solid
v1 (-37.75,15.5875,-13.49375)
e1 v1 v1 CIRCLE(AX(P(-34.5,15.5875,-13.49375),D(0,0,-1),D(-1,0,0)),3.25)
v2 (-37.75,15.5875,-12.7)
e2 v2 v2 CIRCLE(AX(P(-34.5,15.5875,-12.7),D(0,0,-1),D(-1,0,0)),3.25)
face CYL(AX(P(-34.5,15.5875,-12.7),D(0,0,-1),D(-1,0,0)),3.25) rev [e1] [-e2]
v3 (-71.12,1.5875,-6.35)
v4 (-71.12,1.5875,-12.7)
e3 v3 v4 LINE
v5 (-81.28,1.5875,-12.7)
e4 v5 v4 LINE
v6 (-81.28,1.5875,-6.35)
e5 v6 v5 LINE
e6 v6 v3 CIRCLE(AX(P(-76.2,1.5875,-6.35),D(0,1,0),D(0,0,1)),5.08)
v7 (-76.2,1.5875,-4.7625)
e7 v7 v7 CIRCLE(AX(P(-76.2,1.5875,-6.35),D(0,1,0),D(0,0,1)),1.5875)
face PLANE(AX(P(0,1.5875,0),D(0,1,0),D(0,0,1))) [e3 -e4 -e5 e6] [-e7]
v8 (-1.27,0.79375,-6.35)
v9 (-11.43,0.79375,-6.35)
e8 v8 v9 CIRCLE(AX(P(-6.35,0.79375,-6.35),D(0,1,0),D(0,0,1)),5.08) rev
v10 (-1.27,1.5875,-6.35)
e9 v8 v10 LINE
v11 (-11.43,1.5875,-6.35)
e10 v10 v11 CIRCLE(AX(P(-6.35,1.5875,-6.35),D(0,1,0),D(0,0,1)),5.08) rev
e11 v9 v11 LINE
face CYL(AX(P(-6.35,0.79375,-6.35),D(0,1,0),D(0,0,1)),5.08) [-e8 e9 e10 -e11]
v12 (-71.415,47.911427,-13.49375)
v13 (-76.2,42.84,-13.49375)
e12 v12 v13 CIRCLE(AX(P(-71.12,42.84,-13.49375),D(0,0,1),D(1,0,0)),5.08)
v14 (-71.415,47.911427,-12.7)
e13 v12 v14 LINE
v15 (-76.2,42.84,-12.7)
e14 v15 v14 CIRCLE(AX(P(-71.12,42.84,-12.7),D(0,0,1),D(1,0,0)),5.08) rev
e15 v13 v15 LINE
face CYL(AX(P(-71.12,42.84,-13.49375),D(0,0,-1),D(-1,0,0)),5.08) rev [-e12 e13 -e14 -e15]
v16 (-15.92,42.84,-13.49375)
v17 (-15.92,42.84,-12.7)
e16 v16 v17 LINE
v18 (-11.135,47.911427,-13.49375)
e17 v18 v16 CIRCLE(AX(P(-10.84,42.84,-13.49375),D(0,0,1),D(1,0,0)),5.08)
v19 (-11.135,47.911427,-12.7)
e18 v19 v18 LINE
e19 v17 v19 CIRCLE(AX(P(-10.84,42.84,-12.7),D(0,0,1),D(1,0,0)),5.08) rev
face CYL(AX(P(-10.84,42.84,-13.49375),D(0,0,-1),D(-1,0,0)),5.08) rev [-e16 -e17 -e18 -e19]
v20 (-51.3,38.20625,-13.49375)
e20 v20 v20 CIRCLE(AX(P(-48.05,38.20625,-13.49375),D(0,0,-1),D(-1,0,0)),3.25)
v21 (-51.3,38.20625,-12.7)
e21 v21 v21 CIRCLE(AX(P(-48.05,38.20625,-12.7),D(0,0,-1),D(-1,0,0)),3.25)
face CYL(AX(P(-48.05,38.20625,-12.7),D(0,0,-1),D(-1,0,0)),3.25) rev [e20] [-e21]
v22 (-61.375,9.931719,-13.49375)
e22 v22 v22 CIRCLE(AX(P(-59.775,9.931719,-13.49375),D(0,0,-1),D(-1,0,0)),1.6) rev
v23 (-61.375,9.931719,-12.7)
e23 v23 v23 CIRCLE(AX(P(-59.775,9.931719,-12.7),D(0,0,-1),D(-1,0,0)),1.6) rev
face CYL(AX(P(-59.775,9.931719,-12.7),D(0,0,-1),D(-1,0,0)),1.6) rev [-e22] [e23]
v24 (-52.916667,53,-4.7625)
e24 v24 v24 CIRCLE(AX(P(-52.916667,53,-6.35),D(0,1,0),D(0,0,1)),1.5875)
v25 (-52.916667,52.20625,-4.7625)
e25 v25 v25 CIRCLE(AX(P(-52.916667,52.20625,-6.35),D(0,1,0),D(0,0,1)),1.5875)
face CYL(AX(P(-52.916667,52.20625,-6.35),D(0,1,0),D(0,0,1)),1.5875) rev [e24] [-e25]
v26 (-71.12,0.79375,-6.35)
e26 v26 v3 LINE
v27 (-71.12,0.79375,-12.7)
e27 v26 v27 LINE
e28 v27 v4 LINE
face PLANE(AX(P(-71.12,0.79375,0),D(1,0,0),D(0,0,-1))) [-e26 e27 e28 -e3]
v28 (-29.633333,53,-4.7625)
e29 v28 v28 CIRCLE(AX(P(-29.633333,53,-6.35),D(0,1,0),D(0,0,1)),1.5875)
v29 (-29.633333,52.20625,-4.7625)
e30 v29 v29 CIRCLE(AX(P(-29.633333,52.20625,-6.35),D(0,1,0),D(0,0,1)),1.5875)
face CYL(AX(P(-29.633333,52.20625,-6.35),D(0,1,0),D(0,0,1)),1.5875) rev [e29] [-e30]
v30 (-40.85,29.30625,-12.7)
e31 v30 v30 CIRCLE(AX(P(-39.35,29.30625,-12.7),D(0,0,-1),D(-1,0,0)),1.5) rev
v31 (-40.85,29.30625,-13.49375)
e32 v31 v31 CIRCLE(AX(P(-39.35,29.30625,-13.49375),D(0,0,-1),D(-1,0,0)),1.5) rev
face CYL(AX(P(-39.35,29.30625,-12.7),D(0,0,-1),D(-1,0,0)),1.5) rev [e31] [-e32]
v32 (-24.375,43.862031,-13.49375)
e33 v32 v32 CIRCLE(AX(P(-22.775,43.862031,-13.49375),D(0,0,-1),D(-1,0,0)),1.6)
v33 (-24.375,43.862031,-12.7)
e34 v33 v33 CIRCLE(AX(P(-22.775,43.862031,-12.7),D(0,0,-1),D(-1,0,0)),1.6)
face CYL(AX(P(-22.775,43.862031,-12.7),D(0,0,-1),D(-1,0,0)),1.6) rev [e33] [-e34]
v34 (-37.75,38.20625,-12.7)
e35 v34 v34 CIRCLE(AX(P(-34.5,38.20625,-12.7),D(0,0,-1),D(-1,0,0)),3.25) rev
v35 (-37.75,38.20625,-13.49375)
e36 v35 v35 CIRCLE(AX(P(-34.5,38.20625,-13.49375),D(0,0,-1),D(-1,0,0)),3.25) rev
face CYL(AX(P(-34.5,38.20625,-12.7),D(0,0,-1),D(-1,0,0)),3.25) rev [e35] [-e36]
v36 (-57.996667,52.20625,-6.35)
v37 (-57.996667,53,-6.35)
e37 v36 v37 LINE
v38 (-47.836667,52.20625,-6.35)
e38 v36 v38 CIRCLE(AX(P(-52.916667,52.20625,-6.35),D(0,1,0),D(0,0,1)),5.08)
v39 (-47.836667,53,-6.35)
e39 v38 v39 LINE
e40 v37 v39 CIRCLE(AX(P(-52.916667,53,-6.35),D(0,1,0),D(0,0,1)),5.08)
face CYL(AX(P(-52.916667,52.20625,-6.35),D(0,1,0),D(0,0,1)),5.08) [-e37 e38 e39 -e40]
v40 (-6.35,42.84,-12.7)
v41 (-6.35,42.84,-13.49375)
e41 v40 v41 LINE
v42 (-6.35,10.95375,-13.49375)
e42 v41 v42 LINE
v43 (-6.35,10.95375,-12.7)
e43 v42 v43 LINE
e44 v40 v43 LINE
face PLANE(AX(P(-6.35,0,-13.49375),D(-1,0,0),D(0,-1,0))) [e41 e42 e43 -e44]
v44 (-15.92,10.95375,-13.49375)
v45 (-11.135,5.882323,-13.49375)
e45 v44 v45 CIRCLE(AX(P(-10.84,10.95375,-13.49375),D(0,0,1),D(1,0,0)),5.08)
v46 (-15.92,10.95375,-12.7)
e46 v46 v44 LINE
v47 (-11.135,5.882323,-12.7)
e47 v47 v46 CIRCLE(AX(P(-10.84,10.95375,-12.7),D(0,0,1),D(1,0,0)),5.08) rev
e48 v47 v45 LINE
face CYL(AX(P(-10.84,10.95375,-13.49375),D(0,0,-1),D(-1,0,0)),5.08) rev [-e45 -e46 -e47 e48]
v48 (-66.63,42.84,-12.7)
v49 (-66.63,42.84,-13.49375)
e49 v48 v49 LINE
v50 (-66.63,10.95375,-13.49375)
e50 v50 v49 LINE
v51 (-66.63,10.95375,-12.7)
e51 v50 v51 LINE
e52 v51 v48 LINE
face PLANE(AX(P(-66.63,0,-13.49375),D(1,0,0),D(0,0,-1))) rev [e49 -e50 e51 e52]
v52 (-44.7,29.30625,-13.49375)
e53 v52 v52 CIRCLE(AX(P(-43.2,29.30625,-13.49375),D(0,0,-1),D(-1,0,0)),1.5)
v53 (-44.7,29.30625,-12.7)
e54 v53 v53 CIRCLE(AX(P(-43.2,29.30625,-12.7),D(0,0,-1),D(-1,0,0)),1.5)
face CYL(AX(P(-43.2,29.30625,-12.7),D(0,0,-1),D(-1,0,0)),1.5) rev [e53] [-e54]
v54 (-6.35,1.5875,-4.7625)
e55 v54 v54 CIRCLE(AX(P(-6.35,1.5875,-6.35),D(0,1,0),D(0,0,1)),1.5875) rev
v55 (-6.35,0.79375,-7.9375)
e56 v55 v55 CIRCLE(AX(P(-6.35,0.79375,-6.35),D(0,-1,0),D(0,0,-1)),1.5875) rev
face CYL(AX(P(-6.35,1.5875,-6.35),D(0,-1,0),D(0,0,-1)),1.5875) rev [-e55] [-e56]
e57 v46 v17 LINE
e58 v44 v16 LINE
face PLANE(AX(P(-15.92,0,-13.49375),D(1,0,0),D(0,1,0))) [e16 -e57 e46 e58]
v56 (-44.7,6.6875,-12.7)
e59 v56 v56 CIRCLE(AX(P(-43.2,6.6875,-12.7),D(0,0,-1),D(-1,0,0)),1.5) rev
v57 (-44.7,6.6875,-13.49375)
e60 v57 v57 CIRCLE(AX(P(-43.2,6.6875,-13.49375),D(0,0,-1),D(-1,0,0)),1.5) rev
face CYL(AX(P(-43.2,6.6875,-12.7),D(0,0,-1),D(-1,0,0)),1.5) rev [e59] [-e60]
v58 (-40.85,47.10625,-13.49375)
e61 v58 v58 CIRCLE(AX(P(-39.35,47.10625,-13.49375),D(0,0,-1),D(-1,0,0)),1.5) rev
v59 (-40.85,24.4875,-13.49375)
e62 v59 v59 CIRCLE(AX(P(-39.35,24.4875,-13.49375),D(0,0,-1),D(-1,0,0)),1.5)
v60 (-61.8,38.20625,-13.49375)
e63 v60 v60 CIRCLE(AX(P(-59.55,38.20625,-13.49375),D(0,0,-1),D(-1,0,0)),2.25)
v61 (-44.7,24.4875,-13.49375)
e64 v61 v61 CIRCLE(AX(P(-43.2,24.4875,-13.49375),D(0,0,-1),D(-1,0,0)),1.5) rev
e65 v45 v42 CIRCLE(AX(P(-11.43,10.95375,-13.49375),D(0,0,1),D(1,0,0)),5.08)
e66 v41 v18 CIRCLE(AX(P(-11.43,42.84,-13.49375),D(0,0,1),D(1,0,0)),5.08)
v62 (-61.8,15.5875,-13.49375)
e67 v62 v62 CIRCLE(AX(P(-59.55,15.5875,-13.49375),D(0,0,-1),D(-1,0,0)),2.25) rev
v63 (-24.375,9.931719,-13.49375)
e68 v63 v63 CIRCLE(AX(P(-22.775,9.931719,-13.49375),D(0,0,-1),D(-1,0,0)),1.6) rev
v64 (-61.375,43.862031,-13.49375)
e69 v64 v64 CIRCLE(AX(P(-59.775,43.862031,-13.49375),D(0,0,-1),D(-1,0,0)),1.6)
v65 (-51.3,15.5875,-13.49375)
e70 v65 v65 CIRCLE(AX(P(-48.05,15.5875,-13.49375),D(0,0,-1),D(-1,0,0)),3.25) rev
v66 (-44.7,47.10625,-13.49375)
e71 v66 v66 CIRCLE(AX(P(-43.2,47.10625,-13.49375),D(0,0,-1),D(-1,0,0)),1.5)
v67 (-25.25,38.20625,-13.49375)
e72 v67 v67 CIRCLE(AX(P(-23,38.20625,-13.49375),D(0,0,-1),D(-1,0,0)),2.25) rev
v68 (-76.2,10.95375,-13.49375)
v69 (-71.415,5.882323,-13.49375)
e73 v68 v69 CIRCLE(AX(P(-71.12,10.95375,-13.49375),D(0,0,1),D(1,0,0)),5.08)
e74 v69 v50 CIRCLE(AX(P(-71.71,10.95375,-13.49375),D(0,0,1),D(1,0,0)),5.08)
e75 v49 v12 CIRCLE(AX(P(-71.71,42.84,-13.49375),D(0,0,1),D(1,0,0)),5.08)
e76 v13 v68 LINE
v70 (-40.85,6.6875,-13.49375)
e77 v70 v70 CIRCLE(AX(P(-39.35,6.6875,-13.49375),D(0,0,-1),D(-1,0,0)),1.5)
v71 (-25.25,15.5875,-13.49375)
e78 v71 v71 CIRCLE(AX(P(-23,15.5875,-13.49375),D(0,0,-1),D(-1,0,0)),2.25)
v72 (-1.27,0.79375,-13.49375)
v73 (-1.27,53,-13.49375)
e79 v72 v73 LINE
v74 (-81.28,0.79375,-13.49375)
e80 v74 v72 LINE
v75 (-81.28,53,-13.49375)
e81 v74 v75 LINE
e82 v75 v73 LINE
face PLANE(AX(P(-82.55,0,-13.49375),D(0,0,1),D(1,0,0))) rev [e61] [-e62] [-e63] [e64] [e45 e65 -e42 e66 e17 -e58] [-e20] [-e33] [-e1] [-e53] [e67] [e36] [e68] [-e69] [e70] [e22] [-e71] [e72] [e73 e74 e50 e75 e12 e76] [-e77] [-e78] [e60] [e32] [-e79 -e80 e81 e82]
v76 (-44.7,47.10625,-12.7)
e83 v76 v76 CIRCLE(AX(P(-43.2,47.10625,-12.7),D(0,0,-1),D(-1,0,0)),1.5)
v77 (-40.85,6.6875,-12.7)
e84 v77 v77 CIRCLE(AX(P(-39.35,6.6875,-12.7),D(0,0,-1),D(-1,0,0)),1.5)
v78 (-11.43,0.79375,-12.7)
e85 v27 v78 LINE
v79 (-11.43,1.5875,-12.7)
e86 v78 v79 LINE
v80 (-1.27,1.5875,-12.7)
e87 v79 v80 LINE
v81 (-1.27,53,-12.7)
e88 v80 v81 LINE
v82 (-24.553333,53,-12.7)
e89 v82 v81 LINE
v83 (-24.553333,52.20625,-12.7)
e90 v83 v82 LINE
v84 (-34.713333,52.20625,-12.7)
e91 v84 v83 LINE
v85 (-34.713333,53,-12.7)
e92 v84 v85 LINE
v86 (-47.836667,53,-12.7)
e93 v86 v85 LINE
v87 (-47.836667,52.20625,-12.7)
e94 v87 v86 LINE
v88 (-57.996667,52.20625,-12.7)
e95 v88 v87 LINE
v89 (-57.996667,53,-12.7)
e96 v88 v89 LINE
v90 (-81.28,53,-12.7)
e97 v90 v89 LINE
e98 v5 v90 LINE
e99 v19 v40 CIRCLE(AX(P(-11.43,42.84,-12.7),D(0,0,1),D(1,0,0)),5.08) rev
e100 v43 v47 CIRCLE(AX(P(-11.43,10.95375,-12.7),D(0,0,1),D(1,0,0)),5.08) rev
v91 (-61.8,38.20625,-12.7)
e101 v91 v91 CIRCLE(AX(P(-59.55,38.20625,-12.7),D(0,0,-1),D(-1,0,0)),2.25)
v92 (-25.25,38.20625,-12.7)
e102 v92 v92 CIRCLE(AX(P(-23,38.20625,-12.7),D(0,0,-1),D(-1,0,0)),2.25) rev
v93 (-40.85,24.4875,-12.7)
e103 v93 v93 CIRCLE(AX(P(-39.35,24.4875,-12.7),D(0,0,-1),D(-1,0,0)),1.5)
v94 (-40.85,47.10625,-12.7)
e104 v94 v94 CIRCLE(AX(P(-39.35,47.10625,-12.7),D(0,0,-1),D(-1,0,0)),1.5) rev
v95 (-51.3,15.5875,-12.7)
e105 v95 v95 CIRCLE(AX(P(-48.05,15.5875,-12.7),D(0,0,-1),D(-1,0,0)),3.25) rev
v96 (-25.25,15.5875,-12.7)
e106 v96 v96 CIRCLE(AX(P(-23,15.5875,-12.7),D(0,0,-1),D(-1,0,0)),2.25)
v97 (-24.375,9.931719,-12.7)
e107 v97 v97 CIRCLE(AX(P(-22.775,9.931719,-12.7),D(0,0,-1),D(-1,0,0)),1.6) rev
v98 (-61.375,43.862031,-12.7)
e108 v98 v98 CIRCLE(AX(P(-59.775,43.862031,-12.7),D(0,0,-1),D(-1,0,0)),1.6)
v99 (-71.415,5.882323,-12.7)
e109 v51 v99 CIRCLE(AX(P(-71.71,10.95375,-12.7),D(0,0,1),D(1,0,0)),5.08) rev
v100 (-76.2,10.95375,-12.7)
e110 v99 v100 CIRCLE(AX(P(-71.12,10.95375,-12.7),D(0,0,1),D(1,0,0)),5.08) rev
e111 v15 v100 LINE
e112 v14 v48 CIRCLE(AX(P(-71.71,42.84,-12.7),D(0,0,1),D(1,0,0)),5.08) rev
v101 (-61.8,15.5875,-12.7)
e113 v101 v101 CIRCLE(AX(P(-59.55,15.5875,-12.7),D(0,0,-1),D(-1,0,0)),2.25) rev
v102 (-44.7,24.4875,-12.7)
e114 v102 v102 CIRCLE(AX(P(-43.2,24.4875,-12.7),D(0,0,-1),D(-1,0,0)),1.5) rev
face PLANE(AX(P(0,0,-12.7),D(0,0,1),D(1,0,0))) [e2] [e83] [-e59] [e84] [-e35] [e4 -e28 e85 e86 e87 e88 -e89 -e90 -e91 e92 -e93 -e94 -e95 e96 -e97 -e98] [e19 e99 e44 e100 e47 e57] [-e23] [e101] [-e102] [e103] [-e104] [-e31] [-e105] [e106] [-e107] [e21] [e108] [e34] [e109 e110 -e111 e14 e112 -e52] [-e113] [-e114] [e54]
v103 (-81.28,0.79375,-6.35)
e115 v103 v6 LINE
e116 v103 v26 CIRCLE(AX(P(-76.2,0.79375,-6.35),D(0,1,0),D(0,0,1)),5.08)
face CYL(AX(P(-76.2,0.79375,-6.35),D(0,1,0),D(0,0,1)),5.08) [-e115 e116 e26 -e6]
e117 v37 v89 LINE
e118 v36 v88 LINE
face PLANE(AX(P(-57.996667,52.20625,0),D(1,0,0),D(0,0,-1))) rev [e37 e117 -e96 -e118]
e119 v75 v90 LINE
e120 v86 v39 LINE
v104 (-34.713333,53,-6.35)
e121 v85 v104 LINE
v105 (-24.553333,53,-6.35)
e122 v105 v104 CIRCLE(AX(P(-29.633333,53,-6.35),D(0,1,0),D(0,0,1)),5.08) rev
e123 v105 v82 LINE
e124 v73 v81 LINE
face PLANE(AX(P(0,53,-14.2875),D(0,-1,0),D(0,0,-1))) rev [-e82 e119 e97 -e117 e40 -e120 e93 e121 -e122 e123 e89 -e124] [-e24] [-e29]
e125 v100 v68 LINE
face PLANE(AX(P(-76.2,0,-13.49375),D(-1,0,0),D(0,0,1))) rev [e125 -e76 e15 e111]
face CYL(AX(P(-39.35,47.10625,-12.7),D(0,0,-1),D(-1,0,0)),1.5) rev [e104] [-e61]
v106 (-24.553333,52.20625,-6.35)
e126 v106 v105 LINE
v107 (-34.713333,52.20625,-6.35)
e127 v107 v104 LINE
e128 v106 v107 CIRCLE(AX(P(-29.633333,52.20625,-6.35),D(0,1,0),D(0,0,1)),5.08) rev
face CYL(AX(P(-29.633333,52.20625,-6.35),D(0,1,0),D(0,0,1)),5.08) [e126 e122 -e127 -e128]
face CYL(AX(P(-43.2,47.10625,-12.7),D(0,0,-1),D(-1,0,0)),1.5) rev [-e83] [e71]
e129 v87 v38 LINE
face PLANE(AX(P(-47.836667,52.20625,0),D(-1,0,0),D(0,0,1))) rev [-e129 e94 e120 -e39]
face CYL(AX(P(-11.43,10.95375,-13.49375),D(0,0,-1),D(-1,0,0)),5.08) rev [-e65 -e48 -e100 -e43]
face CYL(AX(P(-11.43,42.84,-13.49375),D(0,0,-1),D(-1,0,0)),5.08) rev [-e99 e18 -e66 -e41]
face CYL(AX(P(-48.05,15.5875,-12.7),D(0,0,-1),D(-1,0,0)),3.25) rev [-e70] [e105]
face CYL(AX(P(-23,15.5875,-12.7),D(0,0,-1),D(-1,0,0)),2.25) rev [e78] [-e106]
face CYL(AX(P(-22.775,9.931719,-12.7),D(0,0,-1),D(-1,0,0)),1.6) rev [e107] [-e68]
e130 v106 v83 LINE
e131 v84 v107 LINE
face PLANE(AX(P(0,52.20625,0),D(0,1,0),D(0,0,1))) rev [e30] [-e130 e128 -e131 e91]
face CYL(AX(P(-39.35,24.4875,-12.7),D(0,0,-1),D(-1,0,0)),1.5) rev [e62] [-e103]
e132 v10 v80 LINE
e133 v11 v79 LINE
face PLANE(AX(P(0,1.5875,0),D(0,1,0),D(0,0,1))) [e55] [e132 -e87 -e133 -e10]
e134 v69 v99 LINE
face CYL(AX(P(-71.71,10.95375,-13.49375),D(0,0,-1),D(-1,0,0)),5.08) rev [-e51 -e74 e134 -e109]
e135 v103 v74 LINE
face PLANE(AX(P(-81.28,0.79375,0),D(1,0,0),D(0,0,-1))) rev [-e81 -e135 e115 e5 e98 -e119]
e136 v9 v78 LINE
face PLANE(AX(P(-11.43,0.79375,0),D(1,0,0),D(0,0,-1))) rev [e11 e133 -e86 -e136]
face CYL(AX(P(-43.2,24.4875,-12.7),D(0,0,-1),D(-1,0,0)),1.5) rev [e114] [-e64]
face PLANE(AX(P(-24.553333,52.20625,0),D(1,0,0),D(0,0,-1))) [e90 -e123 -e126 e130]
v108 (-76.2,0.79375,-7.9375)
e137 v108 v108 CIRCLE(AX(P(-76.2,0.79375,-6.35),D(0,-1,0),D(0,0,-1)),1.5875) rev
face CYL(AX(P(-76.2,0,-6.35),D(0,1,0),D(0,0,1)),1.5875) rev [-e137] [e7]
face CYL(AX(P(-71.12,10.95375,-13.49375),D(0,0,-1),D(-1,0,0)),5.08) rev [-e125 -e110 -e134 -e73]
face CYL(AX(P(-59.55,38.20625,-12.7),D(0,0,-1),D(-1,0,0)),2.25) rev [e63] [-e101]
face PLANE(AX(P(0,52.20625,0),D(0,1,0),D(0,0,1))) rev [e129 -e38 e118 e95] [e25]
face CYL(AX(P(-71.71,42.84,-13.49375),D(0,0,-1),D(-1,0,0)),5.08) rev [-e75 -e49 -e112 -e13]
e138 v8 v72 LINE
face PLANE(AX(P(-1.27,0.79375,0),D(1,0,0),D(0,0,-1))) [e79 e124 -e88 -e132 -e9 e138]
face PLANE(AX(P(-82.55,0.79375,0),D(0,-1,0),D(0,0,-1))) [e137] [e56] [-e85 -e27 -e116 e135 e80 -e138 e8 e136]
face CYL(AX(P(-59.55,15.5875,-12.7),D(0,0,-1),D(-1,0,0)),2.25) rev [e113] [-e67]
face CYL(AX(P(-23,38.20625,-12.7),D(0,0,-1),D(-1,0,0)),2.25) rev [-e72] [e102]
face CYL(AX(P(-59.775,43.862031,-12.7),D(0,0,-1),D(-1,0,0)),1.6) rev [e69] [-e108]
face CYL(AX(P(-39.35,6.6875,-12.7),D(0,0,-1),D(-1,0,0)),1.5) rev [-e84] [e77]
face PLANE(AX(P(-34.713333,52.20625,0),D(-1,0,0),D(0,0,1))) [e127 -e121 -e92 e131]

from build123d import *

# Parameters (mm, degrees)
SKETCH1_R             = 1.5875
BOSS_EXTRUDE1_DEPTH   = 1.5875
SKETCH1_W             = 12.7
SKETCH1_H             = 12.7
BOSS_EXTRUDE1_2_DEPTH = 1.5875
SKETCH2_W             = 69.85
SKETCH2_H             = 53
BOSS_EXTRUDE2_DEPTH   = 1.5875
BOSS_EXTRUDE3_DEPTH   = 1.5875
SKETCH6_W             = 1.5875
SKETCH6_H             = 53
BOSS_EXTRUDE4_DEPTH   = 12.7
SKETCH7_W             = 12.7
SKETCH7_H             = 12.7
CUT_EXTRUDE1_DEPTH    = 12.7
SKETCH10_W            = 13.49375
SKETCH10_H            = 0.79375
CUT_EXTRUDE3_DEPTH    = 100.134429722
SKETCH13_R            = 1.25
SKETCH13_R_2          = 3
SKETCH13_R_3          = 2.000000064
CUT_EXTRUDE4_DEPTH    = 12.7
FILLET1_R             = 6.35
FILLET2_R             = 6.35
SKETCH14_W            = 12.7
SKETCH14_H            = 12.7
SKETCH14_R            = 1.5875
BOSS_EXTRUDE5_DEPTH   = 0.79375
FILLET3_R             = 6.35
SKETCH15_R            = 1.6
CUT_EXTRUDE7_DEPTH    = 0.79375
SKETCH16_R            = 1.5875
BOSS_EXTRUDE6_DEPTH   = 0.79375
SKETCH17_W            = 12.7
SKETCH17_H            = 14.933466397
CUT_EXTRUDE8_DEPTH    = 0.79375
CUT_EXTRUDE9_DEPTH    = 0.79375
SKETCH19_W            = 1.27
SKETCH19_H            = 52.20625
CUT_EXTRUDE11_DEPTH   = 0.79375
CUT_EXTRUDE12_DEPTH   = 0.79375
FILLET4_R             = 5.08
FILLET5_R             = 5.08
SKETCH22_R            = 2.25
SKETCH22_R_2          = 2.000000064
SKETCH22_R_3          = 3.25
SKETCH22_R_4          = 3
SKETCH22_R_5          = 1.5
SKETCH22_R_6          = 1.25
CUT_EXTRUDE13_DEPTH   = 0.79375


# Some blends are built 0.0001 mm under size
with BuildPart() as part:
    # Sketch1 → Boss-Extrude1 (new body)
    with BuildSketch(Plane(origin=(0, 0, 0), x_dir=(1, 0, 0), z_dir=(0, 1, 0))):
        Polygon((-12.7, 0), (0, 0), (0, 12.7), (-12.7, 12.7), (-12.7, 6.35), align=None)
        with Locations(Location((-6.35, 6.35, 0), (0, 0, 270))):
            Circle(SKETCH1_R, mode=Mode.SUBTRACT)
    extrude(amount=BOSS_EXTRUDE1_DEPTH)



with BuildPart() as body_2:
    # Sketch1 → Boss-Extrude1 2 (new body)
    with BuildSketch(Plane(origin=(0, 0, 0), x_dir=(1, 0, 0), z_dir=(0, 1, 0))):
        with Locations((-63.5, 6.35)):
            Rectangle(SKETCH1_W, SKETCH1_H)
        with Locations(Location((-63.5, 6.35, 0), (0, 0, 270))):
            Circle(SKETCH1_R, mode=Mode.SUBTRACT)
    extrude(amount=BOSS_EXTRUDE1_2_DEPTH)


with BuildPart() as part_1:
    add(part.part)

    add(body_2.part)  # Boss-Extrude2 merges body 2
    # Sketch2 → Boss-Extrude2 (add)
    with BuildSketch(Plane(origin=(0, 0, -12.7), x_dir=(-1, 0, 0), z_dir=(0, 0, -1))):
        with Locations((34.925, 26.5)):
            Rectangle(SKETCH2_W, SKETCH2_H)
    extrude(amount=BOSS_EXTRUDE2_DEPTH)

    # Sketch5 → Boss-Extrude3 (add)
    with BuildSketch(Plane(origin=(0, 1.5875, 0), x_dir=(1, 0, 0), z_dir=(0, 1, 0))):
        with BuildLine():
            Line((-69.85, 0), (-69.85, 6.35))
            Line((-69.85, 6.35), (-74.6125, 6.35))
            ThreePointArc((-74.6125, 6.35), (-76.2, 4.7625), (-77.7875, 6.35))
            Line((-77.7875, 6.35), (-82.55, 6.35))
            Line((-82.55, 6.35), (-82.55, 0))
            Line((-82.55, 0), (-69.85, 0))
        make_face()
        with BuildLine():
            ThreePointArc((-77.7875, 6.35), (-77.322532015, 7.472532015), (-76.2, 7.9375))
            Line((-76.2, 7.9375), (-76.2, 12.7))
            Line((-76.2, 12.7), (-82.55, 12.7))
            Line((-82.55, 12.7), (-82.55, 6.35))
            Line((-82.55, 6.35), (-77.7875, 6.35))
        make_face()
        with BuildLine():
            Line((-74.6125, 6.35), (-69.85, 6.35))
            Line((-69.85, 6.35), (-69.85, 12.7))
            Line((-69.85, 12.7), (-76.2, 12.7))
            Line((-76.2, 12.7), (-76.2, 7.9375))
            ThreePointArc((-76.2, 7.9375), (-75.077467985, 7.472532015), (-74.6125, 6.35))
        make_face()
    extrude(amount=-BOSS_EXTRUDE3_DEPTH)

    # Sketch6 → Boss-Extrude4 (add)
    with BuildSketch(Plane.ZY.offset(69.85)):
        with Locations((-13.49375, 26.5)):
            Rectangle(SKETCH6_W, SKETCH6_H)
    extrude(amount=BOSS_EXTRUDE4_DEPTH)

    # Sketch7 → Cut-Extrude1 (cut)
    with BuildSketch(Plane(origin=(0, 1.5875, 0), x_dir=(1, 0, 0), z_dir=(0, 1, 0))):
        with Locations((-63.5, 6.35)):
            Rectangle(SKETCH7_W, SKETCH7_H)
    extrude(amount=-CUT_EXTRUDE1_DEPTH, mode=Mode.SUBTRACT)

    # Sketch10 → Cut-Extrude3 (cut, through all)
    with BuildSketch(Plane(origin=(0, 0, 0), x_dir=(0, 0, -1), z_dir=(1, 0, 0))):
        with Locations((6.746875, 0.396875)):
            Rectangle(SKETCH10_W, SKETCH10_H)
        Polygon((13.49375, 0.79375), (13.49375, 0), (14.2875, 0), (14.2875, 53), (13.49375, 53), align=None)
    extrude(amount=-CUT_EXTRUDE3_DEPTH, mode=Mode.SUBTRACT)

    # Sketch13 → Cut-Extrude4 (cut)
    with BuildSketch(Plane(origin=(0, 0, -13.49375), x_dir=(-1, 0, 0), z_dir=(0, 0, -1))):
        with Locations((43.2, 24.48749994)):
            Circle(SKETCH13_R)
        with Locations((43.2, 6.68749994)):
            Circle(SKETCH13_R)
        with Locations((34.5, 15.58749994)):
            Circle(SKETCH13_R_2)
        with Locations((23, 15.58749994)):
            Circle(SKETCH13_R_3)
        with Locations((39.35, 6.68749994)):
            Circle(SKETCH13_R)
        with Locations((39.35, 24.48749994)):
            Circle(SKETCH13_R)
        with Locations((48.05, 15.58749994)):
            Circle(SKETCH13_R_2)
        with Locations((59.55, 15.58749994)):
            Circle(SKETCH13_R_3)
        with Locations((59.55, 38.20625006)):
            Circle(SKETCH13_R_3)
        with Locations((48.05, 38.20625006)):
            Circle(SKETCH13_R_2)
        with Locations((39.35, 29.30625006)):
            Circle(SKETCH13_R)
        with Locations(Location((39.35, 47.10625006, 0), (0, 0, 180))):
            Circle(SKETCH13_R)
        with Locations((23, 38.20625006)):
            Circle(SKETCH13_R_3)
        with Locations((34.5, 38.20625006)):
            Circle(SKETCH13_R_2)
        with Locations((43.2, 47.10625006)):
            Circle(SKETCH13_R)
        with Locations((43.2, 29.30625006)):
            Circle(SKETCH13_R)
    extrude(amount=-CUT_EXTRUDE4_DEPTH, mode=Mode.SUBTRACT)

    # Fillet1
    fillet1_edges = [part_1.edges().sort_by_distance(p)[0] for p in [
        (-12.7, 1.190625, 0),
        (0, 1.190625, 0),
    ]]
    fillet(fillet1_edges, radius=FILLET1_R - 0.0001)  # a hair under: the kernel refuses the full size

    # Fillet2
    fillet2_edges = [part_1.edges().sort_by_distance(p)[0] for p in [
        (-82.55, 1.190625, 0),
        (-69.85, 1.190625, 0),
    ]]
    fillet(fillet2_edges, radius=FILLET2_R - 0.0001)  # a hair under: the kernel refuses the full size

    # Sketch14 → Boss-Extrude5 (add)
    with BuildSketch(Plane(origin=(0, 53, 0), x_dir=(1, 0, 0), z_dir=(0, 1, 0))):
        with Locations((-41.275, 6.35)):
            Rectangle(SKETCH14_W, SKETCH14_H)
        with Locations(Location((-41.275, 6.35, 0), (0, 0, 270))):
            Circle(SKETCH14_R, mode=Mode.SUBTRACT)
    extrude(amount=-BOSS_EXTRUDE5_DEPTH)

    # Fillet3
    fillet3_edges = [part_1.edges().sort_by_distance(p)[0] for p in [
        (-47.625, 52.603125, 0),
        (-34.925, 52.603125, 0),
    ]]
    fillet(fillet3_edges, radius=FILLET3_R - 0.0001)  # a hair under: the kernel refuses the full size

    # Sketch15 → Cut-Extrude7 (cut)
    with BuildSketch(Plane(origin=(0, 0, -13.49375), x_dir=(-1, 0, 0), z_dir=(0, 0, -1))):
        with Locations((22.775, 43.862031033)):
            Circle(SKETCH15_R)
        with Locations((22.775, 9.931718967)):
            Circle(SKETCH15_R)
        with Locations((59.775, 9.931718967)):
            Circle(SKETCH15_R)
        with Locations((59.775, 43.862031033)):
            Circle(SKETCH15_R)
    extrude(amount=-CUT_EXTRUDE7_DEPTH, mode=Mode.SUBTRACT)

    # Sketch16 → Boss-Extrude6 (add)
    # profile 1 of 2: a face of its own
    with BuildSketch(Plane(origin=(0, 53, 0), x_dir=(1, 0, 0), z_dir=(0, 1, 0))):
        with BuildLine():
            Line((-57.996666667, 12.7), (-57.996666667, 6.35))
            ThreePointArc((-57.996666667, 6.35), (-52.916666667, 1.27), (-47.836666667, 6.35))
            Line((-47.836666667, 6.35), (-47.836666667, 12.7))
            Line((-47.836666667, 12.7), (-57.996666667, 12.7))
        make_face()
        with Locations(Location((-52.916666667, 6.35, 0), (0, 0, 270))):
            Circle(SKETCH16_R, mode=Mode.SUBTRACT)
    # profile 2 of 2: a face of its own
    with BuildSketch(Plane(origin=(0, 53, 0), x_dir=(1, 0, 0), z_dir=(0, 1, 0))):
        with BuildLine():
            Line((-24.553333333, 12.7), (-34.713333333, 12.7))
            Line((-34.713333333, 12.7), (-34.713333333, 6.35))
            ThreePointArc((-34.713333333, 6.35), (-29.633333333, 1.27), (-24.553333333, 6.35))
            Line((-24.553333333, 6.35), (-24.553333333, 12.7))
        make_face()
        with Locations(Location((-29.633333333, 6.35, 0), (0, 0, 270))):
            Circle(SKETCH16_R, mode=Mode.SUBTRACT)
    extrude(amount=-BOSS_EXTRUDE6_DEPTH)

    # Sketch17 → Cut-Extrude8 (cut)
    with BuildSketch(Plane(origin=(0, 53, 0), x_dir=(1, 0, 0), z_dir=(0, 1, 0))):
        with Locations((-41.275, 5.233266802)):
            Rectangle(SKETCH17_W, SKETCH17_H)
    extrude(amount=-CUT_EXTRUDE8_DEPTH, mode=Mode.SUBTRACT)

    # Sketch18 → Cut-Extrude9 (cut)
    with BuildSketch(Plane(origin=(0, 1.5875, 0), x_dir=(1, 0, 0), z_dir=(0, 1, 0))):
        with BuildLine():
            ThreePointArc((-71.12, 6.35), (-76.2, 1.27), (-81.28, 6.35))
            Line((-81.28, 6.35), (-81.28, 12.7))
            Line((-81.28, 12.7), (-82.55, 12.7))
            Line((-82.55, 12.7), (-82.55, 6.35))
            ThreePointArc((-82.55, 6.35), (-80.690128061, 1.859871939), (-76.2, 0))
            ThreePointArc((-76.2, 0), (-71.709871939, 1.859871939), (-69.85, 6.35))
            Line((-69.85, 6.35), (-69.85, 12.7))
            Line((-69.85, 12.7), (-71.12, 12.7))
            Line((-71.12, 12.7), (-71.12, 6.35))
        make_face()
        with BuildLine():
            Line((-1.27, 6.35), (-1.27, 12.7))
            Line((-1.27, 12.7), (0, 12.7))
            Line((0, 12.7), (0, 6.35))
            ThreePointArc((0, 6.35), (-6.35, 0), (-12.7, 6.35))
            Line((-12.7, 6.35), (-12.7, 12.7))
            Line((-12.7, 12.7), (-11.43, 12.7))
            Line((-11.43, 12.7), (-11.43, 6.35))
            ThreePointArc((-11.43, 6.35), (-6.35, 1.27), (-1.27, 6.35))
        make_face()
    extrude(amount=-CUT_EXTRUDE9_DEPTH, mode=Mode.SUBTRACT)


with BuildPart() as cut_extrude9_kept_piece:
    # of the separate pieces the step leaves, the one the design keeps (cut_extrude9_pieces_kept)
    add(part_1.part.solids().sort_by_distance((-34.713333333, 53, -12.7))[0])

    # Sketch19 → Cut-Extrude11 (cut)
    with BuildSketch(Plane.XY.offset(-12.7)):
        Polygon((-82.55, 53), (-82.55, 0.79375), (-81.28, 0.79375), (-81.28, 1.5875), (-81.28, 53), align=None)
        with Locations((-0.635, 26.896875)):
            Rectangle(SKETCH19_W, SKETCH19_H)
    extrude(amount=-CUT_EXTRUDE11_DEPTH, mode=Mode.SUBTRACT)

    # Sketch21 → Cut-Extrude12 (cut)
    with BuildSketch(Plane.XY.offset(-12.7)):
        Polygon((-76.2, 5.87375), (-66.630000064, 5.87375), (-66.630000064, 47.92), (-76.2, 47.92), (-76.2, 26.93749994), align=None)
        Polygon((-15.919999936, 47.92), (-6.35, 47.92), (-6.35, 26.93749994), (-6.35, 5.87375), (-15.919999936, 5.87375), align=None)
    extrude(amount=-CUT_EXTRUDE12_DEPTH, mode=Mode.SUBTRACT)

    # Fillet4
    # the kernel refuses this fillet: 5.08 mm, written as the material it adds along each edge
    with BuildSketch(Plane(origin=(-76.2, 47.92, -12.7), x_dir=(0, -1, 0), z_dir=(0, 0, -1)), Plane(origin=(-66.630000064, 47.92, -12.7), x_dir=(-1, 0, 0), z_dir=(0, 0, -1))) as fillet4_piece_1:
        with BuildLine():
            CenterArc((FILLET4_R, -FILLET4_R), FILLET4_R, 90, 90)
            Line((0, -FILLET4_R), (0, 0))
            Line((0, 0), (FILLET4_R, 0))
        make_face()
    extrude(amount=0.79375)

    # Fillet5
    # the kernel refuses this fillet: 5.08 mm, written as the material it adds along each edge
    with BuildSketch(Plane(origin=(-6.35, 47.92, -12.7), x_dir=(-1, 0, 0), z_dir=(0, 0, -1)), Plane(origin=(-15.919999936, 5.87375, -12.7), x_dir=(1, 0, 0), z_dir=(0, 0, -1)), Plane(origin=(-6.35, 5.87375, -12.7), x_dir=(0, 1, 0), z_dir=(0, 0, -1)), Plane(origin=(-66.630000064, 5.87375, -12.7), x_dir=(0, 1, 0), z_dir=(0, 0, -1))) as fillet5_piece_1:
        with BuildLine():
            CenterArc((FILLET5_R, -FILLET5_R), FILLET5_R, 90, 90)
            Line((0, -FILLET5_R), (0, 0))
            Line((0, 0), (FILLET5_R, 0))
        make_face()
    extrude(amount=0.79375)
    with BuildSketch(Plane(origin=(-15.919999936, 47.92, -12.7), x_dir=(1, 0, 0), z_dir=(0, 0, -1)), Plane(origin=(-76.2, 5.87375, -12.7), x_dir=(0, 1, 0), z_dir=(0, 0, -1))) as fillet5_piece_2:
        with BuildLine():
            CenterArc((FILLET5_R, FILLET5_R), FILLET5_R, 180, 90)
            Line((0, FILLET5_R), (0, 0))
            Line((0, 0), (FILLET5_R, 0))
        make_face()
    extrude(amount=0.79375)

    # Sketch22 → Cut-Extrude13 (cut)
    # profile 1 of 16: a face of its own
    with BuildSketch(Plane(origin=(0, 0, -13.49375), x_dir=(-1, 0, 0), z_dir=(0, 0, -1))):
        with Locations((23, 38.20625006)):
            Circle(SKETCH22_R)
        with Locations((23, 38.20625006)):
            Circle(SKETCH22_R_2, mode=Mode.SUBTRACT)
    # profile 2 of 16: a face of its own
    with BuildSketch(Plane(origin=(0, 0, -13.49375), x_dir=(-1, 0, 0), z_dir=(0, 0, -1))):
        with Locations((34.5, 38.20625006)):
            Circle(SKETCH22_R_3)
        with Locations((34.5, 38.20625006)):
            Circle(SKETCH22_R_4, mode=Mode.SUBTRACT)
    # profile 3 of 16: a face of its own
    with BuildSketch(Plane(origin=(0, 0, -13.49375), x_dir=(-1, 0, 0), z_dir=(0, 0, -1))):
        with Locations((39.35, 47.10625006)):
            Circle(SKETCH22_R_5)
        with Locations((39.35, 47.10625006)):
            Circle(SKETCH22_R_6, mode=Mode.SUBTRACT)
    # profile 4 of 16: a face of its own
    with BuildSketch(Plane(origin=(0, 0, -13.49375), x_dir=(-1, 0, 0), z_dir=(0, 0, -1))):
        with Locations((43.2, 47.10625006)):
            Circle(SKETCH22_R_5)
        with Locations((43.2, 47.10625006)):
            Circle(SKETCH22_R_6, mode=Mode.SUBTRACT)
    # profile 5 of 16: a face of its own
    with BuildSketch(Plane(origin=(0, 0, -13.49375), x_dir=(-1, 0, 0), z_dir=(0, 0, -1))):
        with Locations((48.05, 38.20625006)):
            Circle(SKETCH22_R_3)
        with Locations((48.05, 38.20625006)):
            Circle(SKETCH22_R_4, mode=Mode.SUBTRACT)
    # profile 6 of 16: a face of its own
    with BuildSketch(Plane(origin=(0, 0, -13.49375), x_dir=(-1, 0, 0), z_dir=(0, 0, -1))):
        with Locations((59.55, 38.20625006)):
            Circle(SKETCH22_R)
        with Locations((59.55, 38.20625006)):
            Circle(SKETCH22_R_2, mode=Mode.SUBTRACT)
    # profile 7 of 16: a face of its own
    with BuildSketch(Plane(origin=(0, 0, -13.49375), x_dir=(-1, 0, 0), z_dir=(0, 0, -1))):
        with Locations((59.55, 15.58749994)):
            Circle(SKETCH22_R)
        with Locations((59.55, 15.58749994)):
            Circle(SKETCH22_R_2, mode=Mode.SUBTRACT)
    # profile 8 of 16: a face of its own
    with BuildSketch(Plane(origin=(0, 0, -13.49375), x_dir=(-1, 0, 0), z_dir=(0, 0, -1))):
        with Locations((39.35, 6.68749994)):
            Circle(SKETCH22_R_5)
        with Locations((39.35, 6.68749994)):
            Circle(SKETCH22_R_6, mode=Mode.SUBTRACT)
    # profile 9 of 16: a face of its own
    with BuildSketch(Plane(origin=(0, 0, -13.49375), x_dir=(-1, 0, 0), z_dir=(0, 0, -1))):
        with Locations((43.2, 6.68749994)):
            Circle(SKETCH22_R_5)
        with Locations((43.2, 6.68749994)):
            Circle(SKETCH22_R_6, mode=Mode.SUBTRACT)
    # profile 10 of 16: a face of its own
    with BuildSketch(Plane(origin=(0, 0, -13.49375), x_dir=(-1, 0, 0), z_dir=(0, 0, -1))):
        with Locations((34.5, 15.58749994)):
            Circle(SKETCH22_R_3)
        with Locations((34.5, 15.58749994)):
            Circle(SKETCH22_R_4, mode=Mode.SUBTRACT)
    # profile 11 of 16: a face of its own
    with BuildSketch(Plane(origin=(0, 0, -13.49375), x_dir=(-1, 0, 0), z_dir=(0, 0, -1))):
        with Locations((48.05, 15.58749994)):
            Circle(SKETCH22_R_3)
        with Locations((48.05, 15.58749994)):
            Circle(SKETCH22_R_4, mode=Mode.SUBTRACT)
    # profile 12 of 16: a face of its own
    with BuildSketch(Plane(origin=(0, 0, -13.49375), x_dir=(-1, 0, 0), z_dir=(0, 0, -1))):
        with Locations((39.35, 24.48749994)):
            Circle(SKETCH22_R_5)
        with Locations((39.35, 24.48749994)):
            Circle(SKETCH22_R_6, mode=Mode.SUBTRACT)
    # profile 13 of 16: a face of its own
    with BuildSketch(Plane(origin=(0, 0, -13.49375), x_dir=(-1, 0, 0), z_dir=(0, 0, -1))):
        with Locations((43.2, 24.48749994)):
            Circle(SKETCH22_R_5)
        with Locations((43.2, 24.48749994)):
            Circle(SKETCH22_R_6, mode=Mode.SUBTRACT)
    # profile 14 of 16: a face of its own
    with BuildSketch(Plane(origin=(0, 0, -13.49375), x_dir=(-1, 0, 0), z_dir=(0, 0, -1))):
        with Locations((43.2, 29.30625006)):
            Circle(SKETCH22_R_5)
        with Locations((43.2, 29.30625006)):
            Circle(SKETCH22_R_6, mode=Mode.SUBTRACT)
    # profile 15 of 16: a face of its own
    with BuildSketch(Plane(origin=(0, 0, -13.49375), x_dir=(-1, 0, 0), z_dir=(0, 0, -1))):
        with Locations((39.35, 29.30625006)):
            Circle(SKETCH22_R_5)
        with Locations((39.35, 29.30625006)):
            Circle(SKETCH22_R_6, mode=Mode.SUBTRACT)
    # profile 16 of 16: a face of its own
    with BuildSketch(Plane(origin=(0, 0, -13.49375), x_dir=(-1, 0, 0), z_dir=(0, 0, -1))):
        with Locations((23, 15.58749994)):
            Circle(SKETCH22_R)
        with Locations((23, 15.58749994)):
            Circle(SKETCH22_R_2, mode=Mode.SUBTRACT)
    extrude(amount=-CUT_EXTRUDE13_DEPTH, mode=Mode.SUBTRACT)


solid = cut_extrude9_kept_piece.part
